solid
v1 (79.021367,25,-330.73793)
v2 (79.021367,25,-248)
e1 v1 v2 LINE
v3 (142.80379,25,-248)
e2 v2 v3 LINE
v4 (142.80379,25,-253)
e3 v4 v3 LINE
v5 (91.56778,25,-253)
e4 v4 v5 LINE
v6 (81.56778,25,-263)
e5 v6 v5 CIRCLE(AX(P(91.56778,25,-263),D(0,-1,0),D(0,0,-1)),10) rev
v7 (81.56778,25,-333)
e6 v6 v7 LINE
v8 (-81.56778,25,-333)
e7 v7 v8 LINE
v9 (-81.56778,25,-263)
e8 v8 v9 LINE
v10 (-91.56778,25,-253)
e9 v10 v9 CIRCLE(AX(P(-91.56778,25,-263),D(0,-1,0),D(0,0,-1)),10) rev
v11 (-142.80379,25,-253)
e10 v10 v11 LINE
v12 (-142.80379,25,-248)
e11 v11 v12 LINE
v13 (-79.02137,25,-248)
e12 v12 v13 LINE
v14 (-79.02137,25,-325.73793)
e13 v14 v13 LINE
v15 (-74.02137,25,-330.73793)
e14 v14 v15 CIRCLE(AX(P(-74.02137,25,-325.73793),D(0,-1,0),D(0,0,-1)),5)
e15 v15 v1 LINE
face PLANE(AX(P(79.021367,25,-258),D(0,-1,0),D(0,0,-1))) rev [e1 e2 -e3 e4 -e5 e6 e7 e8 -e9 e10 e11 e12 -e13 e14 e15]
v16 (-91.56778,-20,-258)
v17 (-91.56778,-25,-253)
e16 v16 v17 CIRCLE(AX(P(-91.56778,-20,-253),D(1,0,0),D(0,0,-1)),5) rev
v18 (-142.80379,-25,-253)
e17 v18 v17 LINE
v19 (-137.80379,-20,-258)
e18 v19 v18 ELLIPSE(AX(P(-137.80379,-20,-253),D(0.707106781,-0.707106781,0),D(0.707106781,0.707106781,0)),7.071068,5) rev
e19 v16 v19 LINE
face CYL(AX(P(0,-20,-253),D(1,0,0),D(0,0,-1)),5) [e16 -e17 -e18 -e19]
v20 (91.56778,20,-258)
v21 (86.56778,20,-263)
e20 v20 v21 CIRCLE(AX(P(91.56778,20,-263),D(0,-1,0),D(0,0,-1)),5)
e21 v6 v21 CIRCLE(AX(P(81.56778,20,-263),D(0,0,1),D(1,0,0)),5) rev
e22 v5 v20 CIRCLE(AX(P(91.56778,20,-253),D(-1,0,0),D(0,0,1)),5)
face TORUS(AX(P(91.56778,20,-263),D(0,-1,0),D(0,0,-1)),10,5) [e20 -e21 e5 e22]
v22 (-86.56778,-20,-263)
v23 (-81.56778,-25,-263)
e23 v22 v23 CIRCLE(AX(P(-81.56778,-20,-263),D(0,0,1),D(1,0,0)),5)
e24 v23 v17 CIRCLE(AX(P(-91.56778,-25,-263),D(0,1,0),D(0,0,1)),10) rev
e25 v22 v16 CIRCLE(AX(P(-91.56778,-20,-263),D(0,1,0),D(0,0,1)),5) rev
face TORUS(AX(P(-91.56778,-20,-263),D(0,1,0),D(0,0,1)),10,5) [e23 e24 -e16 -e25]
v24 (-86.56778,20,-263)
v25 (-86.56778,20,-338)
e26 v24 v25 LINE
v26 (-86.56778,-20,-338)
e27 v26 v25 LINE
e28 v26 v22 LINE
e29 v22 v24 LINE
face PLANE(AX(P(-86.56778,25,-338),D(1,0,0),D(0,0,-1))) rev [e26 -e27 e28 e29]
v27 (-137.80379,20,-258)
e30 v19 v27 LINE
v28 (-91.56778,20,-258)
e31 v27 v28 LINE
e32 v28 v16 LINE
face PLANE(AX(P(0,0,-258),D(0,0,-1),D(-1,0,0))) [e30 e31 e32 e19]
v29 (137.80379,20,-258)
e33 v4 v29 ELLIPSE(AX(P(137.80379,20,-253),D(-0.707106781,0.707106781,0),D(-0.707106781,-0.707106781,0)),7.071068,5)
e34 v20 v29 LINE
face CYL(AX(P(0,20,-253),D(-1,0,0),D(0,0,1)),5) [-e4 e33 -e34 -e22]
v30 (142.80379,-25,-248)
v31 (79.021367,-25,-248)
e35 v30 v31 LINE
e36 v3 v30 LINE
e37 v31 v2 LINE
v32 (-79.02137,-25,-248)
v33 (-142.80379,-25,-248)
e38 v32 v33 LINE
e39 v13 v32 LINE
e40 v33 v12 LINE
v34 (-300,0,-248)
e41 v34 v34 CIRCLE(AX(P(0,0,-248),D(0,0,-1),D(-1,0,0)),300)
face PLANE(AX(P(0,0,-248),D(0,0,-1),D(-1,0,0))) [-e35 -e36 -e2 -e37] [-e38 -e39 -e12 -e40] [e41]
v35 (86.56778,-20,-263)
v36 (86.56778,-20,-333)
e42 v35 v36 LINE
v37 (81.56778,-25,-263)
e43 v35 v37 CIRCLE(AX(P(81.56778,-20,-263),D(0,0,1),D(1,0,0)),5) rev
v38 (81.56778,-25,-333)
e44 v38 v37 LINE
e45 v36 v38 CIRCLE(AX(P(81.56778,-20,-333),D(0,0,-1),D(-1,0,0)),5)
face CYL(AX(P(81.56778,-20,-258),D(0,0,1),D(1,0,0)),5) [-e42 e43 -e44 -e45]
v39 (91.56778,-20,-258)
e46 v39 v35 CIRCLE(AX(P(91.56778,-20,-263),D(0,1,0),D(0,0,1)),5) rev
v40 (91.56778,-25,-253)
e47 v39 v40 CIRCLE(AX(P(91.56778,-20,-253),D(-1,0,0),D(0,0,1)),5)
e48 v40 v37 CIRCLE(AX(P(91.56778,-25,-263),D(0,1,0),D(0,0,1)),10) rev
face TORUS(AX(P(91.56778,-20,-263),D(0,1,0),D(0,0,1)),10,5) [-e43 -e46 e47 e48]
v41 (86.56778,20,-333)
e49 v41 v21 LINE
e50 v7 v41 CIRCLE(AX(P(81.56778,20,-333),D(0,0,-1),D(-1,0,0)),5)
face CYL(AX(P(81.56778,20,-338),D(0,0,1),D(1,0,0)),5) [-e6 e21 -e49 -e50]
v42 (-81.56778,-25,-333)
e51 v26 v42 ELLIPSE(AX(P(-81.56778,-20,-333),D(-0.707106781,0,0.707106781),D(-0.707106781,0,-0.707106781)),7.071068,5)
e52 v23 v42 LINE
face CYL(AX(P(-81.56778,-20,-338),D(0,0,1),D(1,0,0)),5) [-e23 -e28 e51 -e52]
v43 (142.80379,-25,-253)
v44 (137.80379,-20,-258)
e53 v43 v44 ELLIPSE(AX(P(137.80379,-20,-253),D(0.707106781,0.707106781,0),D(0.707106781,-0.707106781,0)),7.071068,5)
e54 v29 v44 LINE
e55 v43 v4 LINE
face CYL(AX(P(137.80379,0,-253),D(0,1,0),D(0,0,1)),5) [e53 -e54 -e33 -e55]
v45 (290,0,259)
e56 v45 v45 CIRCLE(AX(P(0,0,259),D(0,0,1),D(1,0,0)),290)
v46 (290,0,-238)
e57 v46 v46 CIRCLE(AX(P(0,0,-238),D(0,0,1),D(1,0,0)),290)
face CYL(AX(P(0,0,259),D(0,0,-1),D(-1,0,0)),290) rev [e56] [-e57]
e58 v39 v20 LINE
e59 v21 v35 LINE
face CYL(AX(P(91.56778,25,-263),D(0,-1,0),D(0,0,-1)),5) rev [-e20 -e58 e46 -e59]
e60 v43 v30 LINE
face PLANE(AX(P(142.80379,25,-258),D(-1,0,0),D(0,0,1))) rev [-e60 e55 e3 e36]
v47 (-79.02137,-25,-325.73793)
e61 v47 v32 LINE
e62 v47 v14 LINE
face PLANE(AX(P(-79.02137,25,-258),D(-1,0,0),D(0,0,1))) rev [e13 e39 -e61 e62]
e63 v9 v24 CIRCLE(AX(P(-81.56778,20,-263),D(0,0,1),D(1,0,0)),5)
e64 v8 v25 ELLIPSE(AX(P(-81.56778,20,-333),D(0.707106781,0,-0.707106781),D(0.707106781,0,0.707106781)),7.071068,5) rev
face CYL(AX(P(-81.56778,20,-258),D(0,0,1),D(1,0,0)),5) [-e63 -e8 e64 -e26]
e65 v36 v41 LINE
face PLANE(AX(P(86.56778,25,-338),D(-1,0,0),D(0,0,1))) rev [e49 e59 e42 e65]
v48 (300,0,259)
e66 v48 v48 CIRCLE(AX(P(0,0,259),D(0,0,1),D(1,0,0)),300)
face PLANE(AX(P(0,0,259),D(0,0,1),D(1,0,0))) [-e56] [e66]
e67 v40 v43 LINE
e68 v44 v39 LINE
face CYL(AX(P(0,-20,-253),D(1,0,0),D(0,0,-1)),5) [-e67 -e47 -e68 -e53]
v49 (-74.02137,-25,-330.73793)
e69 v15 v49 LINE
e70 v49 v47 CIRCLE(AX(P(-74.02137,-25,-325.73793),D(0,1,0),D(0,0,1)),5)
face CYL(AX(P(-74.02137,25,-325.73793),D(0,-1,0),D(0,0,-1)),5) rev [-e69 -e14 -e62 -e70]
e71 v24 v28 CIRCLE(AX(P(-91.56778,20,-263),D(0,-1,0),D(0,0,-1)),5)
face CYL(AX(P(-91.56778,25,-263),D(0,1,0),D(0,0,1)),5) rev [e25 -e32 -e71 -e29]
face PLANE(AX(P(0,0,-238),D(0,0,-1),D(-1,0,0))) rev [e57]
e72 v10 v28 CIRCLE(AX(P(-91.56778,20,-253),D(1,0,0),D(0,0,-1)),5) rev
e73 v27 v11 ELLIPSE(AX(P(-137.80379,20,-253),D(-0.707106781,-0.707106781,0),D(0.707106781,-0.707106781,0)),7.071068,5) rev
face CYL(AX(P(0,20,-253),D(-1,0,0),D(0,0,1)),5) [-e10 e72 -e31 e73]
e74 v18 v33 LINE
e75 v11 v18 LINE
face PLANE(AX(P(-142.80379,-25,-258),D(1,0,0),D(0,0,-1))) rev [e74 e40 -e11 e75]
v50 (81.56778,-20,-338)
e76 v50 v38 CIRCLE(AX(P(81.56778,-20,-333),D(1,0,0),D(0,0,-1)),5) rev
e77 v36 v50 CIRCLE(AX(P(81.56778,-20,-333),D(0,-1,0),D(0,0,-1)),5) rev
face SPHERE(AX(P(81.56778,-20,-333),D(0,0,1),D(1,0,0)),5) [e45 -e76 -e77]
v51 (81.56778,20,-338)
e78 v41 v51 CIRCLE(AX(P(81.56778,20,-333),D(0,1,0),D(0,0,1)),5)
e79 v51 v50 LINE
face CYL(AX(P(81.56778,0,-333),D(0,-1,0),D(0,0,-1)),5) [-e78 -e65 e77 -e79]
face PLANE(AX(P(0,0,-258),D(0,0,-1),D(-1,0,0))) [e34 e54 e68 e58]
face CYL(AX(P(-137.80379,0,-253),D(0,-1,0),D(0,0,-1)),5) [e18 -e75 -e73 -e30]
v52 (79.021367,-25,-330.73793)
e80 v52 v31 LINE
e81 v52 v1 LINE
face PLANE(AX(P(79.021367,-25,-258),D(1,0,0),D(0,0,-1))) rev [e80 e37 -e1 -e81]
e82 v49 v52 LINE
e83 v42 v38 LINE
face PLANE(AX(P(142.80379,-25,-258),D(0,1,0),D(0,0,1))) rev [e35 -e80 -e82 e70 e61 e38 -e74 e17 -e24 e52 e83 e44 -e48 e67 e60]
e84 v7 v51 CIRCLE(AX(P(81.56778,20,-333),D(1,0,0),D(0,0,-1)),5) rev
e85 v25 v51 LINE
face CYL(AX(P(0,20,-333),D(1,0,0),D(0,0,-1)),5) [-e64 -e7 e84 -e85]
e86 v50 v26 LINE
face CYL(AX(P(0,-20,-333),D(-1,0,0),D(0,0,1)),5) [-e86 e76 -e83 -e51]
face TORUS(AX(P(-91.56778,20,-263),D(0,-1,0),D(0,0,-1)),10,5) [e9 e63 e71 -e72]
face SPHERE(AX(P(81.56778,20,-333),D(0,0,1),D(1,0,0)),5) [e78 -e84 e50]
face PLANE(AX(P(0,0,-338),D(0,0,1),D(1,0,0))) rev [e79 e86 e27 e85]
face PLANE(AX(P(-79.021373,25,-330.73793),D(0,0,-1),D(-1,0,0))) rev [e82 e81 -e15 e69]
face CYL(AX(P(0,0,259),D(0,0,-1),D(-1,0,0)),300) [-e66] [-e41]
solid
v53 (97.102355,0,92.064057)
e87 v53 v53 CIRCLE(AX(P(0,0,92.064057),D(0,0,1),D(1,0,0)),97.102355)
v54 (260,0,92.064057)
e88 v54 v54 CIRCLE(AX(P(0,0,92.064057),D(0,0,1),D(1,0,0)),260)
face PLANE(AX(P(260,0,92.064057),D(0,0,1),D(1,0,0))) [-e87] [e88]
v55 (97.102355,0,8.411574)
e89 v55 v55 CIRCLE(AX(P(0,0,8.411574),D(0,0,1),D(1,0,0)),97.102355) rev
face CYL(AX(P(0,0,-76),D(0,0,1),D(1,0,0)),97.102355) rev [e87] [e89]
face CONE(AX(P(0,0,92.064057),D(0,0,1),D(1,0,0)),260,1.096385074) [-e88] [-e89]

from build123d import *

# Parameters (mm, degrees)
BOSS_EXTRUDE2_DEPTH      = 259
BOSS_EXTRUDE2_DEPTH_BACK = 238
SKETCH5_R                = 300
SKETCH5_R_2              = 290
CUT_EXTRUDE1_DEPTH       = 186
CUT_EXTRUDE1_DEPTH_BACK  = 76
SKETCH6_R                = 97.102355
SKETCH7_R                = 300
BOSS_EXTRUDE5_DEPTH      = 10
SKETCH8_W                = 63.782423146
SKETCH8_H                = 50
SKETCH8_W_2              = 63.78242
BOSS_EXTRUDE6_DEPTH      = 10
SKETCH9_W                = 7.546412457
SKETCH9_H                = 50
BOSS_EXTRUDE7_DEPTH      = 80
SKETCH10_W               = 7.262070367
SKETCH10_H               = 50
BOSS_EXTRUDE8_DEPTH      = 158.04274
SKETCH13_W               = 7.54641
SKETCH13_H               = 50
BOSS_EXTRUDE9_DEPTH      = 80
FILLET3_R                = 5


with BuildPart() as part:
    # Sketch3 → Revolve2 (revolve)
    with BuildSketch(Plane(origin=(0, 0, 0), x_dir=(1, 0, 0), z_dir=(0, 1, 0))):
        Polygon((0, 41.453192435), (260, -92.06405694), (0, -92.06405694), align=None)
    revolve(axis=Axis((0, 0, 92.06405694), (0, 0, -1)))

    # Sketch6 → Cut-Extrude1 (cut, two sides: drawn at the far end of the back side and taken through both)
    with BuildSketch(Plane.XY.offset(-CUT_EXTRUDE1_DEPTH_BACK)):
        Circle(SKETCH6_R)
    extrude(amount=CUT_EXTRUDE1_DEPTH + CUT_EXTRUDE1_DEPTH_BACK, mode=Mode.SUBTRACT)


with BuildPart() as body_2:
    # Sketch5 → Boss-Extrude2 (new, two sides: drawn at the far end of the back side and taken through both)
    with BuildSketch(Plane.XY.offset(-BOSS_EXTRUDE2_DEPTH_BACK)):
        Circle(SKETCH5_R)
        Circle(SKETCH5_R_2, mode=Mode.SUBTRACT)
    extrude(amount=BOSS_EXTRUDE2_DEPTH + BOSS_EXTRUDE2_DEPTH_BACK)

    # Sketch7 → Boss-Extrude5 (add)
    with BuildSketch(Plane(origin=(0, 0, -238), x_dir=(-1, 0, 0), z_dir=(0, 0, -1))):
        Circle(SKETCH7_R)
    extrude(amount=BOSS_EXTRUDE5_DEPTH)

    # Sketch8 → Boss-Extrude6 (add)
    with BuildSketch(Plane(origin=(0, 0, -248), x_dir=(-1, 0, 0), z_dir=(0, 0, -1))):
        with Locations((-110.912578662, 0)):
            Rectangle(SKETCH8_W, SKETCH8_H)
        with Locations((110.91258, 0)):
            Rectangle(SKETCH8_W_2, SKETCH8_H)
    extrude(amount=BOSS_EXTRUDE6_DEPTH)

    # Sketch9 → Boss-Extrude7 (add)
    with BuildSketch(Plane(origin=(0, 0, -258), x_dir=(-1, 0, 0), z_dir=(0, 0, -1))):
        with Locations((-82.794573318, 0)):
            Rectangle(SKETCH9_W, SKETCH9_H)
    extrude(amount=BOSS_EXTRUDE7_DEPTH)

    # Sketch10 → Boss-Extrude8 (add)
    with BuildSketch(Plane.ZY.offset(-79.021367089)):
        with Locations((-334.368964817, 0)):
            Rectangle(SKETCH10_W, SKETCH10_H)
    extrude(amount=BOSS_EXTRUDE8_DEPTH)

    # Sketch13 → Boss-Extrude9 (add)
    with BuildSketch(Plane(origin=(0, 0, -258), x_dir=(-1, 0, 0), z_dir=(0, 0, -1))):
        with Locations((82.794575, 0)):
            Rectangle(SKETCH13_W, SKETCH13_H)
    extrude(amount=BOSS_EXTRUDE9_DEPTH)

    # Fillet3
    # the kernel refuses this fillet: 5 mm, written as the material it adds along each edge
    with BuildSketch(Plane(origin=(86.567779546, 25, -258), x_dir=(1, 0, 0), z_dir=(0, -1, 0))) as fillet3_piece_1:
        with BuildLine():
            CenterArc((FILLET3_R, -FILLET3_R), FILLET3_R, 90, 90)
            Line((0, -FILLET3_R), (0, 0))
            Line((0, 0), (FILLET3_R, 0))
        make_face()
    fillet3_piece_1_solid = extrude(amount=50, mode=Mode.PRIVATE)
    with BuildSketch(Plane(origin=(-79.02137, -25, -330.737929633), x_dir=(0, 0, 1), z_dir=(0, 1, 0)), Plane(origin=(-86.56778, 25, -258), x_dir=(-1, 0, 0), z_dir=(0, -1, 0))) as fillet3_piece_2:
        with BuildLine():
            CenterArc((FILLET3_R, FILLET3_R), FILLET3_R, 180, 90)
            Line((0, FILLET3_R), (0, 0))
            Line((0, 0), (FILLET3_R, 0))
        make_face()
    fillet3_piece_2_solid = extrude(amount=50, mode=Mode.PRIVATE)
    add([fillet3_piece_1_solid, fillet3_piece_2_solid])
    # the kernel refuses this fillet: 5 mm, written as the material it takes off along each edge
    with BuildSketch(Plane(origin=(142.803790235, 37.5, -258), x_dir=(0, 0, 1), z_dir=(0, -1, 0)), Plane(origin=(-142.80379, -37.5, -258), x_dir=(0, 0, 1), z_dir=(0, 1, 0)), Plane(origin=(86.567779546, 37.5, -338), x_dir=(0, 0, 1), z_dir=(0, -1, 0))) as fillet3_2_piece_1:
        with BuildLine():
            CenterArc((FILLET3_R, FILLET3_R), FILLET3_R, 180, 90)
            Line((0, FILLET3_R), (0, 0))
            Line((0, 0), (FILLET3_R, 0))
        make_face()
    fillet3_2_piece_1_solid = extrude(amount=75, mode=Mode.PRIVATE)
    with BuildSketch(Plane(origin=(79.021367089, 25, -338), x_dir=(0, 0, 1), z_dir=(-1, 0, 0))) as fillet3_2_piece_2:
        with BuildLine():
            CenterArc((FILLET3_R, -FILLET3_R), FILLET3_R, 90, 90)
            Line((0, -FILLET3_R), (0, 0))
            Line((0, 0), (FILLET3_R, 0))
        make_face()
    fillet3_2_piece_2_solid = extrude(amount=158.042737089, mode=Mode.PRIVATE)
    with BuildSketch(Plane(origin=(-79.02137, 25, -338), x_dir=(0, 0, 1), z_dir=(-1, 0, 0))) as fillet3_2_piece_3:
        with BuildLine():
            CenterArc((FILLET3_R, -FILLET3_R), FILLET3_R, 90, 90)
            Line((0, -FILLET3_R), (0, 0))
            Line((0, 0), (FILLET3_R, 0))
        make_face()
    fillet3_2_piece_3_solid = extrude(amount=2.911e-06, mode=Mode.PRIVATE)
    with BuildSketch(Plane(origin=(79.021367089, -25, -338), x_dir=(0, 0, 1), z_dir=(-1, 0, 0))) as fillet3_2_piece_4:
        with BuildLine():
            CenterArc((FILLET3_R, FILLET3_R), FILLET3_R, 180, 90)
            Line((0, FILLET3_R), (0, 0))
            Line((0, 0), (FILLET3_R, 0))
        make_face()
    fillet3_2_piece_4_solid = extrude(amount=158.042737089, mode=Mode.PRIVATE)
    with BuildSketch(Plane(origin=(-79.02137, -25, -338), x_dir=(0, 0, 1), z_dir=(-1, 0, 0))) as fillet3_2_piece_5:
        with BuildLine():
            CenterArc((FILLET3_R, FILLET3_R), FILLET3_R, 180, 90)
            Line((0, FILLET3_R), (0, 0))
            Line((0, 0), (FILLET3_R, 0))
        make_face()
    fillet3_2_piece_5_solid = extrude(amount=2.911e-06, mode=Mode.PRIVATE)
    with BuildSketch(Plane(origin=(99.067779546, -25, -338), x_dir=(0, 0, 1), z_dir=(-1, 0, 0)), Plane(origin=(79.021367089, 25, -338), x_dir=(0, 0, 1), z_dir=(1, 0, 0))) as fillet3_2_piece_6:
        with BuildLine():
            CenterArc((FILLET3_R, FILLET3_R), FILLET3_R, 180, 90)
            Line((0, FILLET3_R), (0, 0))
            Line((0, 0), (FILLET3_R, 0))
        make_face()
    fillet3_2_piece_6_solid = extrude(amount=20.046412458, mode=Mode.PRIVATE)
    with BuildSketch(Plane(origin=(-99.06778, -25, -338), x_dir=(0, 0, 1), z_dir=(1, 0, 0)), Plane(origin=(-79.021372911, 25, -338), x_dir=(0, 0, 1), z_dir=(-1, 0, 0))) as fillet3_2_piece_7:
        with BuildLine():
            CenterArc((FILLET3_R, -FILLET3_R), FILLET3_R, 90, 90)
            Line((0, -FILLET3_R), (0, 0))
            Line((0, 0), (FILLET3_R, 0))
        make_face()
    fillet3_2_piece_7_solid = extrude(amount=20.046407089, mode=Mode.PRIVATE)
    add([fillet3_2_piece_1_solid, fillet3_2_piece_2_solid, fillet3_2_piece_3_solid, fillet3_2_piece_4_solid, fillet3_2_piece_5_solid, fillet3_2_piece_6_solid, fillet3_2_piece_7_solid], mode=Mode.SUBTRACT)
    # the kernel refuses this fillet: 5 mm, written as the material it takes off along each edge
    with BuildSketch(Plane(origin=(81.567779546, -20, -333), x_dir=(1, 0, 0), z_dir=(0, -1, 0))) as fillet3_3_piece_1_section:
        Polygon((0, 0), (FILLET3_R * 1.02, 0), (FILLET3_R * 1.02, -FILLET3_R * 1.02), (0, -FILLET3_R * 1.02), align=None)
    fillet3_3_piece_1 = extrude(amount=FILLET3_R * 1.02, mode=Mode.PRIVATE)
    fillet3_3_piece_1 = fillet3_3_piece_1 - Plane(origin=(81.567779546, -20, -333), x_dir=(-0.7071067811865475, 0, 0.7071067811865475), z_dir=(0, -1, 0)) * Sphere(FILLET3_R, mode=Mode.PRIVATE)
    with BuildSketch(Plane(origin=(81.567779546, 20, -333), x_dir=(1, 0, 0), z_dir=(0, 1, 0))) as fillet3_3_piece_2_section:
        Polygon((0, 0), (FILLET3_R * 1.02, 0), (FILLET3_R * 1.02, FILLET3_R * 1.02), (0, FILLET3_R * 1.02), align=None)
    fillet3_3_piece_2 = extrude(amount=FILLET3_R * 1.02, mode=Mode.PRIVATE)
    fillet3_3_piece_2 = fillet3_3_piece_2 - Plane(origin=(81.567779546, 20, -333), x_dir=(-0.7071067811865475, 0, 0.7071067811865475), z_dir=(0, 1, 0)) * Sphere(FILLET3_R, mode=Mode.PRIVATE)
    with BuildSketch(Plane(origin=(150.303790235, -25, -258), x_dir=(0, 0, 1), z_dir=(-1, 0, 0)), Plane(origin=(91.567779546, 25, -258), x_dir=(0, 0, 1), z_dir=(1, 0, 0))) as fillet3_3_piece_3:
        with BuildLine():
            CenterArc((FILLET3_R, FILLET3_R), FILLET3_R, 180, 90)
            Line((0, FILLET3_R), (0, 0))
            Line((0, 0), (FILLET3_R, 0))
        make_face()
    fillet3_3_piece_3_solid = extrude(amount=58.736010689, mode=Mode.PRIVATE)
    with BuildSketch(Plane(origin=(-150.30379, 25, -258), x_dir=(0, 0, 1), z_dir=(1, 0, 0)), Plane(origin=(-91.56778, -25, -258), x_dir=(0, 0, 1), z_dir=(-1, 0, 0))) as fillet3_3_piece_4:
        with BuildLine():
            CenterArc((FILLET3_R, FILLET3_R), FILLET3_R, 180, 90)
            Line((0, FILLET3_R), (0, 0))
            Line((0, 0), (FILLET3_R, 0))
        make_face()
    fillet3_3_piece_4_solid = extrude(amount=58.73601, mode=Mode.PRIVATE)
    with BuildSketch(Plane(origin=(86.567779546, 25, -263), x_dir=(-1, 0, 0), z_dir=(0, 0, -1))) as fillet3_3_piece_5:
        with BuildLine():
            CenterArc((FILLET3_R, -FILLET3_R), FILLET3_R, 90, 90)
            Line((0, -FILLET3_R), (0, 0))
            Line((0, 0), (FILLET3_R, 0))
        make_face()
    fillet3_3_piece_5_solid = extrude(amount=70, mode=Mode.PRIVATE)
    with BuildSketch(Plane(origin=(86.567779546, -25, -263), x_dir=(-1, 0, 0), z_dir=(0, 0, -1))) as fillet3_3_piece_6:
        with BuildLine():
            CenterArc((FILLET3_R, FILLET3_R), FILLET3_R, 180, 90)
            Line((0, FILLET3_R), (0, 0))
            Line((0, 0), (FILLET3_R, 0))
        make_face()
    fillet3_3_piece_6_solid = extrude(amount=70, mode=Mode.PRIVATE)
    with BuildSketch(Plane(origin=(-86.56778, -25, -263), x_dir=(1, 0, 0), z_dir=(0, 0, -1))) as fillet3_3_piece_7:
        with BuildLine():
            CenterArc((FILLET3_R, -FILLET3_R), FILLET3_R, 90, 90)
            Line((0, -FILLET3_R), (0, 0))
            Line((0, 0), (FILLET3_R, 0))
        make_face()
    fillet3_3_piece_7_solid = extrude(amount=82.5, mode=Mode.PRIVATE)
    with BuildSketch(Plane(origin=(-86.56778, 25, -263), x_dir=(1, 0, 0), z_dir=(0, 0, -1))) as fillet3_3_piece_8:
        with BuildLine():
            CenterArc((FILLET3_R, FILLET3_R), FILLET3_R, 180, 90)
            Line((0, FILLET3_R), (0, 0))
            Line((0, 0), (FILLET3_R, 0))
        make_face()
    fillet3_3_piece_8_solid = extrude(amount=82.5, mode=Mode.PRIVATE)
    with BuildSketch(Plane(origin=(-91.56778, 25, -263), x_dir=(0, 0, 1), z_dir=(-1, 0, 0))) as fillet3_3_piece_9:
        with BuildLine():
            CenterArc((5 + FILLET3_R, -FILLET3_R), FILLET3_R, 90, 90)
            Line((5, -FILLET3_R), (5, 0))
            Line((5, 0), (5 + FILLET3_R, 0))
        make_face()
    fillet3_3_piece_9_solid = revolve(axis=Axis((-91.56778, 25, -263), (0, 1, 0)), revolution_arc=90, mode=Mode.PRIVATE)
    with BuildSketch(Plane(origin=(-91.56778, -25, -263), x_dir=(0, 0, 1), z_dir=(-1, 0, 0))) as fillet3_3_piece_10:
        with BuildLine():
            CenterArc((5 + FILLET3_R, FILLET3_R), FILLET3_R, 180, 90)
            Line((5, FILLET3_R), (5, 0))
            Line((5, 0), (5 + FILLET3_R, 0))
        make_face()
    fillet3_3_piece_10_solid = revolve(axis=Axis((-91.56778, -25, -263), (0, 1, 0)), revolution_arc=90, mode=Mode.PRIVATE)
    with BuildSketch(Plane(origin=(91.567779546, -25, -263), x_dir=(0, 0, 1), z_dir=(1, 0, 0))) as fillet3_3_piece_11:
        with BuildLine():
            CenterArc((5 + FILLET3_R, -FILLET3_R), FILLET3_R, 90, 90)
            Line((5, -FILLET3_R), (5, 0))
            Line((5, 0), (5 + FILLET3_R, 0))
        make_face()
    fillet3_3_piece_11_solid = revolve(axis=Axis((91.567779546, -25, -263), (0, -1, 0)), revolution_arc=90, mode=Mode.PRIVATE)
    with BuildSketch(Plane(origin=(91.567779546, 25, -263), x_dir=(0, 0, 1), z_dir=(1, 0, 0))) as fillet3_3_piece_12:
        with BuildLine():
            CenterArc((5 + FILLET3_R, FILLET3_R), FILLET3_R, 180, 90)
            Line((5, FILLET3_R), (5, 0))
            Line((5, 0), (5 + FILLET3_R, 0))
        make_face()
    fillet3_3_piece_12_solid = revolve(axis=Axis((91.567779546, 25, -263), (0, -1, 0)), revolution_arc=90, mode=Mode.PRIVATE)
    add([fillet3_3_piece_1, fillet3_3_piece_2, fillet3_3_piece_3_solid, fillet3_3_piece_4_solid, fillet3_3_piece_5_solid, fillet3_3_piece_6_solid, fillet3_3_piece_7_solid, fillet3_3_piece_8_solid, fillet3_3_piece_9_solid, fillet3_3_piece_10_solid, fillet3_3_piece_11_solid, fillet3_3_piece_12_solid], mode=Mode.SUBTRACT)


solid = Compound([part.part, body_2.part])
